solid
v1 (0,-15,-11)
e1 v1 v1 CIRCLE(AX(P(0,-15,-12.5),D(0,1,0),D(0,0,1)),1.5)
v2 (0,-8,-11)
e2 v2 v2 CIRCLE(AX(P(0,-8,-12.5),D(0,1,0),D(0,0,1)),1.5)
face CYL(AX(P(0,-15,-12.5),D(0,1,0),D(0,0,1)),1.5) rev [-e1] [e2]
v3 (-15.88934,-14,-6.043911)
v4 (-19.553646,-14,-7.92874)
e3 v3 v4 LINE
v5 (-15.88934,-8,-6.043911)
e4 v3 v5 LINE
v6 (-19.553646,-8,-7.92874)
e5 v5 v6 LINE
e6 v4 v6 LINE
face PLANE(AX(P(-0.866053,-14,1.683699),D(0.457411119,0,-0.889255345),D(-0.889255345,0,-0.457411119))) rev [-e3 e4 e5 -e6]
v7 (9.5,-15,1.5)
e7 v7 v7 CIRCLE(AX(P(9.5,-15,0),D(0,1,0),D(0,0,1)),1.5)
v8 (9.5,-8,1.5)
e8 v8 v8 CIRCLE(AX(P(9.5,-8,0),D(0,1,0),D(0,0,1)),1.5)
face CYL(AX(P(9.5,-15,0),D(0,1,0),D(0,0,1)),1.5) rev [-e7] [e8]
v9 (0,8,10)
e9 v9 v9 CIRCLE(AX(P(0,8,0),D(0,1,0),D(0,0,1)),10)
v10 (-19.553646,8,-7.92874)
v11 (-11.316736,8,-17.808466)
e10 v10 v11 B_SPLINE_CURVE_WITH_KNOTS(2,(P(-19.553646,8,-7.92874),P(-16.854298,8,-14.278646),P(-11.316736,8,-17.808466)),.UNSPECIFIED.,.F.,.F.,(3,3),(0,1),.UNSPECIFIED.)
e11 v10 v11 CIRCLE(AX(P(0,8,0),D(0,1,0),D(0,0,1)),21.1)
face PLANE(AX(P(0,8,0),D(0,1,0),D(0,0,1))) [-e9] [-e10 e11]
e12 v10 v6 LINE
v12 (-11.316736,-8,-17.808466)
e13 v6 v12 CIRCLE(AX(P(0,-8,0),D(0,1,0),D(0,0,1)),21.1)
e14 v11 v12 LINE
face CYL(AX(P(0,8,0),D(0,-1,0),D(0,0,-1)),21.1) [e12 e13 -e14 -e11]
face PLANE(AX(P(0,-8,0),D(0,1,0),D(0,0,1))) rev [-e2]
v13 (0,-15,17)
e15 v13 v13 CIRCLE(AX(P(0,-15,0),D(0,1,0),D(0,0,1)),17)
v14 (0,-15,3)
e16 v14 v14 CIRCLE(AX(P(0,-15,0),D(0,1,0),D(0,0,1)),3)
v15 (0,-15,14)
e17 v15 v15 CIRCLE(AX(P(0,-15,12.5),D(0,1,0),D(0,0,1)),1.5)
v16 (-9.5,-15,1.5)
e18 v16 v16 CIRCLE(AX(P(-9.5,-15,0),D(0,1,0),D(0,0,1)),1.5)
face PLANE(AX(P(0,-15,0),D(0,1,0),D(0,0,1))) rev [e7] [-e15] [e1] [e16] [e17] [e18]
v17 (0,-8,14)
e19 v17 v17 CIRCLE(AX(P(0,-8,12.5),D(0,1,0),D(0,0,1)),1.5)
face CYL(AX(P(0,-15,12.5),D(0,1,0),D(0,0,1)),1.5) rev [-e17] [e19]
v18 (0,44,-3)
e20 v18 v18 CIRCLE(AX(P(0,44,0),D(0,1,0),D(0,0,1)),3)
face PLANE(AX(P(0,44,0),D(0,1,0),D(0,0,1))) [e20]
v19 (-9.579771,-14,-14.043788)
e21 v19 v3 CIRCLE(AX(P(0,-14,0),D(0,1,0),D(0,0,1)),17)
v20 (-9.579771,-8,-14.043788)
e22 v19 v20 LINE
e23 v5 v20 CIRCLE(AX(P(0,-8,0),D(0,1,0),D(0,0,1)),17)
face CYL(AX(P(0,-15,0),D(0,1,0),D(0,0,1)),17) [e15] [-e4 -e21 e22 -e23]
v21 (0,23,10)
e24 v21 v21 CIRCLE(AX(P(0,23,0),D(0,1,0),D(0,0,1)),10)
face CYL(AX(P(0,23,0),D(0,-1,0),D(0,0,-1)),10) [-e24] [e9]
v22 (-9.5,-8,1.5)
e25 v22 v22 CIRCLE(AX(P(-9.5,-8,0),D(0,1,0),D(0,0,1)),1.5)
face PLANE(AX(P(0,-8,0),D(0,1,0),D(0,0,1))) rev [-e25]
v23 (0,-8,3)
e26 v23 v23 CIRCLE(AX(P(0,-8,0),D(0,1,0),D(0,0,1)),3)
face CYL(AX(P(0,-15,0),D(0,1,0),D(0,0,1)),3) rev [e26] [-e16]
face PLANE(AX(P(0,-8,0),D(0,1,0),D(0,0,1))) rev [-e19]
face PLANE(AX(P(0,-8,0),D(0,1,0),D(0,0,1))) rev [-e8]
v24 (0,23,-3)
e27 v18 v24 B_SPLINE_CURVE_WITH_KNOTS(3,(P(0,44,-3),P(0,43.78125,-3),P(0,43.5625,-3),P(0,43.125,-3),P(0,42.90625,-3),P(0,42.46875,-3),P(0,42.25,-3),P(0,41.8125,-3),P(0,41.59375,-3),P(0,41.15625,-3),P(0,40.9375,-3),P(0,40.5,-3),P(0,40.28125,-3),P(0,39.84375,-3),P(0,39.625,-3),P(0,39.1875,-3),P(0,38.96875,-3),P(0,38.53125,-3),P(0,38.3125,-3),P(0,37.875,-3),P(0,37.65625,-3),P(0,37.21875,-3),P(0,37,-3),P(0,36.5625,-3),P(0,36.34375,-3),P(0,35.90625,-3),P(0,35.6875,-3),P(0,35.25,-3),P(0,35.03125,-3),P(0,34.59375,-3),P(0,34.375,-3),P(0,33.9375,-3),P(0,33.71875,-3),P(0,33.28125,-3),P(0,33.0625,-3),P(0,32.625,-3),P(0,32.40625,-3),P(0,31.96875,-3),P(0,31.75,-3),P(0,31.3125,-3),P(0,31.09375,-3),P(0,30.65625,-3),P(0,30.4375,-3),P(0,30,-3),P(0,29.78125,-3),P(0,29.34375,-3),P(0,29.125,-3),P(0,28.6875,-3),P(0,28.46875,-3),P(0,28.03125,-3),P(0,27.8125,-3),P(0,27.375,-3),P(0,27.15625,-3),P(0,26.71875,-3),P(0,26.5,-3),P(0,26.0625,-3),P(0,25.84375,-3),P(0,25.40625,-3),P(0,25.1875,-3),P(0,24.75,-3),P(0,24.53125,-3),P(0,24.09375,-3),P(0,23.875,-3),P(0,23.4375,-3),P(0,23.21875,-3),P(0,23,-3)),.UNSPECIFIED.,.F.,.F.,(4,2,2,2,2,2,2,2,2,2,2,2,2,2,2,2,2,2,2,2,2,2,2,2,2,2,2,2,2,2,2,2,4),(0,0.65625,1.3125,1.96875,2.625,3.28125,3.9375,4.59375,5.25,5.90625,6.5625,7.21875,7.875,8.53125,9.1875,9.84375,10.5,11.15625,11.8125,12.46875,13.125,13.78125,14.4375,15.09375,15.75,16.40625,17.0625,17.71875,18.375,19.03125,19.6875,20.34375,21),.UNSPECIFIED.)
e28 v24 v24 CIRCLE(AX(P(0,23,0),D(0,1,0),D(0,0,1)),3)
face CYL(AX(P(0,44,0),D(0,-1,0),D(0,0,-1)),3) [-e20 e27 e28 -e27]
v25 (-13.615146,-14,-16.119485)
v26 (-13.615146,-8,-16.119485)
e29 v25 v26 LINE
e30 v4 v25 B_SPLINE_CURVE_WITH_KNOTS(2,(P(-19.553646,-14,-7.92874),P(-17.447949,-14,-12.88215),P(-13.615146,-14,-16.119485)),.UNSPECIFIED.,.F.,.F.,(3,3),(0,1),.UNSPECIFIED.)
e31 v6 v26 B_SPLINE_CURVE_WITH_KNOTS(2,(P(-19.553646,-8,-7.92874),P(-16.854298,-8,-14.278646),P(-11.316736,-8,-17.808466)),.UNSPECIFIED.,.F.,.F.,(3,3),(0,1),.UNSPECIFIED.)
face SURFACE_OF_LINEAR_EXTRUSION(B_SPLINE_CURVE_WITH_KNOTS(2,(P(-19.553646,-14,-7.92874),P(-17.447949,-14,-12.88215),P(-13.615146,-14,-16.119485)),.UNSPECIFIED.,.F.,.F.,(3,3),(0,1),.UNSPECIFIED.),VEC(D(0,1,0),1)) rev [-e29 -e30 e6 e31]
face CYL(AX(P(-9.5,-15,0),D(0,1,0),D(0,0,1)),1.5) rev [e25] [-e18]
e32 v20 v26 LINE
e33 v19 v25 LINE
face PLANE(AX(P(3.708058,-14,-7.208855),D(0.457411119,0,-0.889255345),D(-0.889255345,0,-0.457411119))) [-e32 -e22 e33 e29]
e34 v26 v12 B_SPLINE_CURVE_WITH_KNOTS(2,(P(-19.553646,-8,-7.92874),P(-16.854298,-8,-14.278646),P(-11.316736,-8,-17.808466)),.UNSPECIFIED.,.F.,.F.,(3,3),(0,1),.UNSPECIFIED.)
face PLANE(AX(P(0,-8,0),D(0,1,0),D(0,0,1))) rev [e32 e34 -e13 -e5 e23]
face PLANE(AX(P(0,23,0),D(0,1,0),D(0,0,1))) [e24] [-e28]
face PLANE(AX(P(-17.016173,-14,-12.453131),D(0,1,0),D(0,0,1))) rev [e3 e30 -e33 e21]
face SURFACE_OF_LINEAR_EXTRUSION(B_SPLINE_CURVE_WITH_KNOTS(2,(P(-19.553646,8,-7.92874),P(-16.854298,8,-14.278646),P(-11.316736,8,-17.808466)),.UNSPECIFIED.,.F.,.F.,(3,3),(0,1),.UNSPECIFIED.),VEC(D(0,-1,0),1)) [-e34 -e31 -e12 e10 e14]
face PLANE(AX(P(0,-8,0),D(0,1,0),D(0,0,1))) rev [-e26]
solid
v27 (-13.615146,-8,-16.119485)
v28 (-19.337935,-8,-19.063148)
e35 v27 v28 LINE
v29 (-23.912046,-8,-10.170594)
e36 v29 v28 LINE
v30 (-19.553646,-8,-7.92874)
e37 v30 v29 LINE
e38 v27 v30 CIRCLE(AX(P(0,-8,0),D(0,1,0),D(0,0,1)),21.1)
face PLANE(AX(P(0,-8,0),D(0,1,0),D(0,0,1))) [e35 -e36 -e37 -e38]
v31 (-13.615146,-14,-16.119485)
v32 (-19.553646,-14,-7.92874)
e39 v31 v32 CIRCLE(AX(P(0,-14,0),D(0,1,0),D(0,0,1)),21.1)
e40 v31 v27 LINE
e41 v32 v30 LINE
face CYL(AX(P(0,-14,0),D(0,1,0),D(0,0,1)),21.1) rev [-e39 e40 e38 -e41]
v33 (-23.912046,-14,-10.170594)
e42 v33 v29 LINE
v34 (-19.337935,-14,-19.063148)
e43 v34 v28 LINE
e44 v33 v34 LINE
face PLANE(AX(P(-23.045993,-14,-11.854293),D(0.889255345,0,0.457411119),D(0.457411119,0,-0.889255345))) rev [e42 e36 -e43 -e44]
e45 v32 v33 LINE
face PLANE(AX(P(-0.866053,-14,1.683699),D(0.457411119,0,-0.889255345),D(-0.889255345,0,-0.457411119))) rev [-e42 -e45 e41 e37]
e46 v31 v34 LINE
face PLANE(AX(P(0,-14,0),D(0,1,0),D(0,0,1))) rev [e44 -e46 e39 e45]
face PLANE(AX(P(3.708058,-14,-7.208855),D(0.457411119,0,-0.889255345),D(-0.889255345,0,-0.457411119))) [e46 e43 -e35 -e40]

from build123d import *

# Parameters (mm, degrees)
BOSS_EXTRUDE1_DEPTH   = 8
BOSS_EXTRUDE2_START   = 8
SKETCH2_3_R           = 10
BOSS_EXTRUDE2_DEPTH   = 15
BOSS_EXTRUDE3_START   = 23
SKETCH2_4_R           = 3
BOSS_EXTRUDE3_DEPTH   = 21
BOSS_EXTRUDE4_START   = -15
SKETCH2_5_R           = 17
SKETCH2_5_R_2         = 1.5
SKETCH2_5_R_3         = 3
BOSS_EXTRUDE4_DEPTH   = 7
BOSS_EXTRUDE5_START   = -14
BOSS_EXTRUDE5_DEPTH   = 6
BOSS_EXTRUDE5_2_DEPTH = 6


# Read off the part's stored shape, not the designer's step: Boss-Extrude5
with BuildPart() as part:
    # Sketch2 → Boss-Extrude1 (new, symmetric)
    with BuildSketch(Plane(origin=(0, 0, 0), x_dir=(1, 0, 0), z_dir=(0, 1, 0))):
        with BuildLine():
            ThreePointArc((-19.553646138, 7.928740297), (17.082571878, -12.385303308), (-13.615145539, 16.119485474))
            add(Edge.make_bspline(
                [(-19.553646138, 7.928740297), (-17.447949133, 12.882150211), (-13.615145539, 16.119485474)],
                knots=[0, 0, 0, 0.780076173, 0.780076173, 0.780076173], degree=2))
        make_face()
    extrude(amount=BOSS_EXTRUDE1_DEPTH, both=True)

    # Sketch2<3> → Boss-Extrude2 (add)
    with BuildSketch(Plane(origin=(0, 0, 0), x_dir=(1, 0, 0), z_dir=(0, 1, 0)).offset(BOSS_EXTRUDE2_START)):
        with Locations(Location((0, 0, 0), (0, 0, 270))):
            Circle(SKETCH2_3_R)
    extrude(amount=BOSS_EXTRUDE2_DEPTH)

    # Sketch2<4> → Boss-Extrude3 (add)
    with BuildSketch(Plane(origin=(0, 0, 0), x_dir=(1, 0, 0), z_dir=(0, 1, 0)).offset(BOSS_EXTRUDE3_START)):
        with Locations(Location((0, 0, 0), (0, 0, 90))):
            Circle(SKETCH2_4_R)
    extrude(amount=BOSS_EXTRUDE3_DEPTH)

    # Sketch2<5> → Boss-Extrude4 (add)
    with BuildSketch(Plane(origin=(0, 0, 0), x_dir=(1, 0, 0), z_dir=(0, 1, 0)).offset(BOSS_EXTRUDE4_START)):
        with Locations(Location((0, 0, 0), (0, 0, 270))):
            Circle(SKETCH2_5_R)
        with Locations(Location((0, 12.5, 0), (0, 0, 270))):
            Circle(SKETCH2_5_R_2, mode=Mode.SUBTRACT)
        with Locations(Location((-9.5, 0, 0), (0, 0, 270))):
            Circle(SKETCH2_5_R_2, mode=Mode.SUBTRACT)
        with Locations(Location((9.5, 0, 0), (0, 0, 270))):
            Circle(SKETCH2_5_R_2, mode=Mode.SUBTRACT)
        with Locations(Location((0, -12.5, 0), (0, 0, 270))):
            Circle(SKETCH2_5_R_2, mode=Mode.SUBTRACT)
        with Locations(Location((0, 0, 0), (0, 0, 90))):
            Circle(SKETCH2_5_R_3, mode=Mode.SUBTRACT)
    extrude(amount=BOSS_EXTRUDE4_DEPTH)

    # Boss-Extrude5 2 outline → Boss-Extrude5 2 (add)
    with BuildSketch(Plane(origin=(0, 0, 0), x_dir=(1, 0, 0), z_dir=(0, 1, 0)).offset(BOSS_EXTRUDE5_START)):
        with BuildLine():
            add(Edge.make_bspline(
                [(-19.553646138, 7.928740297), (-17.447949162, 12.882150142), (-13.615145647, 16.119485383)],
                knots=[0, 0, 0, 1, 1, 1], degree=2))
            Line((-19.553646138, 7.928740297), (-15.889340318, 6.043911337))
            ThreePointArc((-15.889340318, 6.043911337), (-13.34797436, 10.527657883), (-9.579771413, 14.043787939))
            Line((-9.579771413, 14.043787939), (-13.615145647, 16.119485383))
        make_face()
    extrude(amount=BOSS_EXTRUDE5_2_DEPTH)


with BuildPart() as body_2:
    # Boss-Extrude5 outline → Boss-Extrude5 (new body)
    with BuildSketch(Plane(origin=(0, 0, 0), x_dir=(1, 0, 0), z_dir=(0, 1, 0)).offset(BOSS_EXTRUDE5_START)):
        with BuildLine():
            Line((-19.337935144, 19.063147812), (-23.912046336, 10.170594366))
            Line((-23.912046336, 10.170594366), (-19.553646138, 7.928740297))
            ThreePointArc((-19.553646138, 7.928740297), (-17.08257192, 12.385303251), (-13.615145647, 16.119485383))
            Line((-13.615145647, 16.119485383), (-19.337935144, 19.063147812))
        make_face()
    extrude(amount=BOSS_EXTRUDE5_DEPTH)


solid = Compound([part.part, body_2.part])
